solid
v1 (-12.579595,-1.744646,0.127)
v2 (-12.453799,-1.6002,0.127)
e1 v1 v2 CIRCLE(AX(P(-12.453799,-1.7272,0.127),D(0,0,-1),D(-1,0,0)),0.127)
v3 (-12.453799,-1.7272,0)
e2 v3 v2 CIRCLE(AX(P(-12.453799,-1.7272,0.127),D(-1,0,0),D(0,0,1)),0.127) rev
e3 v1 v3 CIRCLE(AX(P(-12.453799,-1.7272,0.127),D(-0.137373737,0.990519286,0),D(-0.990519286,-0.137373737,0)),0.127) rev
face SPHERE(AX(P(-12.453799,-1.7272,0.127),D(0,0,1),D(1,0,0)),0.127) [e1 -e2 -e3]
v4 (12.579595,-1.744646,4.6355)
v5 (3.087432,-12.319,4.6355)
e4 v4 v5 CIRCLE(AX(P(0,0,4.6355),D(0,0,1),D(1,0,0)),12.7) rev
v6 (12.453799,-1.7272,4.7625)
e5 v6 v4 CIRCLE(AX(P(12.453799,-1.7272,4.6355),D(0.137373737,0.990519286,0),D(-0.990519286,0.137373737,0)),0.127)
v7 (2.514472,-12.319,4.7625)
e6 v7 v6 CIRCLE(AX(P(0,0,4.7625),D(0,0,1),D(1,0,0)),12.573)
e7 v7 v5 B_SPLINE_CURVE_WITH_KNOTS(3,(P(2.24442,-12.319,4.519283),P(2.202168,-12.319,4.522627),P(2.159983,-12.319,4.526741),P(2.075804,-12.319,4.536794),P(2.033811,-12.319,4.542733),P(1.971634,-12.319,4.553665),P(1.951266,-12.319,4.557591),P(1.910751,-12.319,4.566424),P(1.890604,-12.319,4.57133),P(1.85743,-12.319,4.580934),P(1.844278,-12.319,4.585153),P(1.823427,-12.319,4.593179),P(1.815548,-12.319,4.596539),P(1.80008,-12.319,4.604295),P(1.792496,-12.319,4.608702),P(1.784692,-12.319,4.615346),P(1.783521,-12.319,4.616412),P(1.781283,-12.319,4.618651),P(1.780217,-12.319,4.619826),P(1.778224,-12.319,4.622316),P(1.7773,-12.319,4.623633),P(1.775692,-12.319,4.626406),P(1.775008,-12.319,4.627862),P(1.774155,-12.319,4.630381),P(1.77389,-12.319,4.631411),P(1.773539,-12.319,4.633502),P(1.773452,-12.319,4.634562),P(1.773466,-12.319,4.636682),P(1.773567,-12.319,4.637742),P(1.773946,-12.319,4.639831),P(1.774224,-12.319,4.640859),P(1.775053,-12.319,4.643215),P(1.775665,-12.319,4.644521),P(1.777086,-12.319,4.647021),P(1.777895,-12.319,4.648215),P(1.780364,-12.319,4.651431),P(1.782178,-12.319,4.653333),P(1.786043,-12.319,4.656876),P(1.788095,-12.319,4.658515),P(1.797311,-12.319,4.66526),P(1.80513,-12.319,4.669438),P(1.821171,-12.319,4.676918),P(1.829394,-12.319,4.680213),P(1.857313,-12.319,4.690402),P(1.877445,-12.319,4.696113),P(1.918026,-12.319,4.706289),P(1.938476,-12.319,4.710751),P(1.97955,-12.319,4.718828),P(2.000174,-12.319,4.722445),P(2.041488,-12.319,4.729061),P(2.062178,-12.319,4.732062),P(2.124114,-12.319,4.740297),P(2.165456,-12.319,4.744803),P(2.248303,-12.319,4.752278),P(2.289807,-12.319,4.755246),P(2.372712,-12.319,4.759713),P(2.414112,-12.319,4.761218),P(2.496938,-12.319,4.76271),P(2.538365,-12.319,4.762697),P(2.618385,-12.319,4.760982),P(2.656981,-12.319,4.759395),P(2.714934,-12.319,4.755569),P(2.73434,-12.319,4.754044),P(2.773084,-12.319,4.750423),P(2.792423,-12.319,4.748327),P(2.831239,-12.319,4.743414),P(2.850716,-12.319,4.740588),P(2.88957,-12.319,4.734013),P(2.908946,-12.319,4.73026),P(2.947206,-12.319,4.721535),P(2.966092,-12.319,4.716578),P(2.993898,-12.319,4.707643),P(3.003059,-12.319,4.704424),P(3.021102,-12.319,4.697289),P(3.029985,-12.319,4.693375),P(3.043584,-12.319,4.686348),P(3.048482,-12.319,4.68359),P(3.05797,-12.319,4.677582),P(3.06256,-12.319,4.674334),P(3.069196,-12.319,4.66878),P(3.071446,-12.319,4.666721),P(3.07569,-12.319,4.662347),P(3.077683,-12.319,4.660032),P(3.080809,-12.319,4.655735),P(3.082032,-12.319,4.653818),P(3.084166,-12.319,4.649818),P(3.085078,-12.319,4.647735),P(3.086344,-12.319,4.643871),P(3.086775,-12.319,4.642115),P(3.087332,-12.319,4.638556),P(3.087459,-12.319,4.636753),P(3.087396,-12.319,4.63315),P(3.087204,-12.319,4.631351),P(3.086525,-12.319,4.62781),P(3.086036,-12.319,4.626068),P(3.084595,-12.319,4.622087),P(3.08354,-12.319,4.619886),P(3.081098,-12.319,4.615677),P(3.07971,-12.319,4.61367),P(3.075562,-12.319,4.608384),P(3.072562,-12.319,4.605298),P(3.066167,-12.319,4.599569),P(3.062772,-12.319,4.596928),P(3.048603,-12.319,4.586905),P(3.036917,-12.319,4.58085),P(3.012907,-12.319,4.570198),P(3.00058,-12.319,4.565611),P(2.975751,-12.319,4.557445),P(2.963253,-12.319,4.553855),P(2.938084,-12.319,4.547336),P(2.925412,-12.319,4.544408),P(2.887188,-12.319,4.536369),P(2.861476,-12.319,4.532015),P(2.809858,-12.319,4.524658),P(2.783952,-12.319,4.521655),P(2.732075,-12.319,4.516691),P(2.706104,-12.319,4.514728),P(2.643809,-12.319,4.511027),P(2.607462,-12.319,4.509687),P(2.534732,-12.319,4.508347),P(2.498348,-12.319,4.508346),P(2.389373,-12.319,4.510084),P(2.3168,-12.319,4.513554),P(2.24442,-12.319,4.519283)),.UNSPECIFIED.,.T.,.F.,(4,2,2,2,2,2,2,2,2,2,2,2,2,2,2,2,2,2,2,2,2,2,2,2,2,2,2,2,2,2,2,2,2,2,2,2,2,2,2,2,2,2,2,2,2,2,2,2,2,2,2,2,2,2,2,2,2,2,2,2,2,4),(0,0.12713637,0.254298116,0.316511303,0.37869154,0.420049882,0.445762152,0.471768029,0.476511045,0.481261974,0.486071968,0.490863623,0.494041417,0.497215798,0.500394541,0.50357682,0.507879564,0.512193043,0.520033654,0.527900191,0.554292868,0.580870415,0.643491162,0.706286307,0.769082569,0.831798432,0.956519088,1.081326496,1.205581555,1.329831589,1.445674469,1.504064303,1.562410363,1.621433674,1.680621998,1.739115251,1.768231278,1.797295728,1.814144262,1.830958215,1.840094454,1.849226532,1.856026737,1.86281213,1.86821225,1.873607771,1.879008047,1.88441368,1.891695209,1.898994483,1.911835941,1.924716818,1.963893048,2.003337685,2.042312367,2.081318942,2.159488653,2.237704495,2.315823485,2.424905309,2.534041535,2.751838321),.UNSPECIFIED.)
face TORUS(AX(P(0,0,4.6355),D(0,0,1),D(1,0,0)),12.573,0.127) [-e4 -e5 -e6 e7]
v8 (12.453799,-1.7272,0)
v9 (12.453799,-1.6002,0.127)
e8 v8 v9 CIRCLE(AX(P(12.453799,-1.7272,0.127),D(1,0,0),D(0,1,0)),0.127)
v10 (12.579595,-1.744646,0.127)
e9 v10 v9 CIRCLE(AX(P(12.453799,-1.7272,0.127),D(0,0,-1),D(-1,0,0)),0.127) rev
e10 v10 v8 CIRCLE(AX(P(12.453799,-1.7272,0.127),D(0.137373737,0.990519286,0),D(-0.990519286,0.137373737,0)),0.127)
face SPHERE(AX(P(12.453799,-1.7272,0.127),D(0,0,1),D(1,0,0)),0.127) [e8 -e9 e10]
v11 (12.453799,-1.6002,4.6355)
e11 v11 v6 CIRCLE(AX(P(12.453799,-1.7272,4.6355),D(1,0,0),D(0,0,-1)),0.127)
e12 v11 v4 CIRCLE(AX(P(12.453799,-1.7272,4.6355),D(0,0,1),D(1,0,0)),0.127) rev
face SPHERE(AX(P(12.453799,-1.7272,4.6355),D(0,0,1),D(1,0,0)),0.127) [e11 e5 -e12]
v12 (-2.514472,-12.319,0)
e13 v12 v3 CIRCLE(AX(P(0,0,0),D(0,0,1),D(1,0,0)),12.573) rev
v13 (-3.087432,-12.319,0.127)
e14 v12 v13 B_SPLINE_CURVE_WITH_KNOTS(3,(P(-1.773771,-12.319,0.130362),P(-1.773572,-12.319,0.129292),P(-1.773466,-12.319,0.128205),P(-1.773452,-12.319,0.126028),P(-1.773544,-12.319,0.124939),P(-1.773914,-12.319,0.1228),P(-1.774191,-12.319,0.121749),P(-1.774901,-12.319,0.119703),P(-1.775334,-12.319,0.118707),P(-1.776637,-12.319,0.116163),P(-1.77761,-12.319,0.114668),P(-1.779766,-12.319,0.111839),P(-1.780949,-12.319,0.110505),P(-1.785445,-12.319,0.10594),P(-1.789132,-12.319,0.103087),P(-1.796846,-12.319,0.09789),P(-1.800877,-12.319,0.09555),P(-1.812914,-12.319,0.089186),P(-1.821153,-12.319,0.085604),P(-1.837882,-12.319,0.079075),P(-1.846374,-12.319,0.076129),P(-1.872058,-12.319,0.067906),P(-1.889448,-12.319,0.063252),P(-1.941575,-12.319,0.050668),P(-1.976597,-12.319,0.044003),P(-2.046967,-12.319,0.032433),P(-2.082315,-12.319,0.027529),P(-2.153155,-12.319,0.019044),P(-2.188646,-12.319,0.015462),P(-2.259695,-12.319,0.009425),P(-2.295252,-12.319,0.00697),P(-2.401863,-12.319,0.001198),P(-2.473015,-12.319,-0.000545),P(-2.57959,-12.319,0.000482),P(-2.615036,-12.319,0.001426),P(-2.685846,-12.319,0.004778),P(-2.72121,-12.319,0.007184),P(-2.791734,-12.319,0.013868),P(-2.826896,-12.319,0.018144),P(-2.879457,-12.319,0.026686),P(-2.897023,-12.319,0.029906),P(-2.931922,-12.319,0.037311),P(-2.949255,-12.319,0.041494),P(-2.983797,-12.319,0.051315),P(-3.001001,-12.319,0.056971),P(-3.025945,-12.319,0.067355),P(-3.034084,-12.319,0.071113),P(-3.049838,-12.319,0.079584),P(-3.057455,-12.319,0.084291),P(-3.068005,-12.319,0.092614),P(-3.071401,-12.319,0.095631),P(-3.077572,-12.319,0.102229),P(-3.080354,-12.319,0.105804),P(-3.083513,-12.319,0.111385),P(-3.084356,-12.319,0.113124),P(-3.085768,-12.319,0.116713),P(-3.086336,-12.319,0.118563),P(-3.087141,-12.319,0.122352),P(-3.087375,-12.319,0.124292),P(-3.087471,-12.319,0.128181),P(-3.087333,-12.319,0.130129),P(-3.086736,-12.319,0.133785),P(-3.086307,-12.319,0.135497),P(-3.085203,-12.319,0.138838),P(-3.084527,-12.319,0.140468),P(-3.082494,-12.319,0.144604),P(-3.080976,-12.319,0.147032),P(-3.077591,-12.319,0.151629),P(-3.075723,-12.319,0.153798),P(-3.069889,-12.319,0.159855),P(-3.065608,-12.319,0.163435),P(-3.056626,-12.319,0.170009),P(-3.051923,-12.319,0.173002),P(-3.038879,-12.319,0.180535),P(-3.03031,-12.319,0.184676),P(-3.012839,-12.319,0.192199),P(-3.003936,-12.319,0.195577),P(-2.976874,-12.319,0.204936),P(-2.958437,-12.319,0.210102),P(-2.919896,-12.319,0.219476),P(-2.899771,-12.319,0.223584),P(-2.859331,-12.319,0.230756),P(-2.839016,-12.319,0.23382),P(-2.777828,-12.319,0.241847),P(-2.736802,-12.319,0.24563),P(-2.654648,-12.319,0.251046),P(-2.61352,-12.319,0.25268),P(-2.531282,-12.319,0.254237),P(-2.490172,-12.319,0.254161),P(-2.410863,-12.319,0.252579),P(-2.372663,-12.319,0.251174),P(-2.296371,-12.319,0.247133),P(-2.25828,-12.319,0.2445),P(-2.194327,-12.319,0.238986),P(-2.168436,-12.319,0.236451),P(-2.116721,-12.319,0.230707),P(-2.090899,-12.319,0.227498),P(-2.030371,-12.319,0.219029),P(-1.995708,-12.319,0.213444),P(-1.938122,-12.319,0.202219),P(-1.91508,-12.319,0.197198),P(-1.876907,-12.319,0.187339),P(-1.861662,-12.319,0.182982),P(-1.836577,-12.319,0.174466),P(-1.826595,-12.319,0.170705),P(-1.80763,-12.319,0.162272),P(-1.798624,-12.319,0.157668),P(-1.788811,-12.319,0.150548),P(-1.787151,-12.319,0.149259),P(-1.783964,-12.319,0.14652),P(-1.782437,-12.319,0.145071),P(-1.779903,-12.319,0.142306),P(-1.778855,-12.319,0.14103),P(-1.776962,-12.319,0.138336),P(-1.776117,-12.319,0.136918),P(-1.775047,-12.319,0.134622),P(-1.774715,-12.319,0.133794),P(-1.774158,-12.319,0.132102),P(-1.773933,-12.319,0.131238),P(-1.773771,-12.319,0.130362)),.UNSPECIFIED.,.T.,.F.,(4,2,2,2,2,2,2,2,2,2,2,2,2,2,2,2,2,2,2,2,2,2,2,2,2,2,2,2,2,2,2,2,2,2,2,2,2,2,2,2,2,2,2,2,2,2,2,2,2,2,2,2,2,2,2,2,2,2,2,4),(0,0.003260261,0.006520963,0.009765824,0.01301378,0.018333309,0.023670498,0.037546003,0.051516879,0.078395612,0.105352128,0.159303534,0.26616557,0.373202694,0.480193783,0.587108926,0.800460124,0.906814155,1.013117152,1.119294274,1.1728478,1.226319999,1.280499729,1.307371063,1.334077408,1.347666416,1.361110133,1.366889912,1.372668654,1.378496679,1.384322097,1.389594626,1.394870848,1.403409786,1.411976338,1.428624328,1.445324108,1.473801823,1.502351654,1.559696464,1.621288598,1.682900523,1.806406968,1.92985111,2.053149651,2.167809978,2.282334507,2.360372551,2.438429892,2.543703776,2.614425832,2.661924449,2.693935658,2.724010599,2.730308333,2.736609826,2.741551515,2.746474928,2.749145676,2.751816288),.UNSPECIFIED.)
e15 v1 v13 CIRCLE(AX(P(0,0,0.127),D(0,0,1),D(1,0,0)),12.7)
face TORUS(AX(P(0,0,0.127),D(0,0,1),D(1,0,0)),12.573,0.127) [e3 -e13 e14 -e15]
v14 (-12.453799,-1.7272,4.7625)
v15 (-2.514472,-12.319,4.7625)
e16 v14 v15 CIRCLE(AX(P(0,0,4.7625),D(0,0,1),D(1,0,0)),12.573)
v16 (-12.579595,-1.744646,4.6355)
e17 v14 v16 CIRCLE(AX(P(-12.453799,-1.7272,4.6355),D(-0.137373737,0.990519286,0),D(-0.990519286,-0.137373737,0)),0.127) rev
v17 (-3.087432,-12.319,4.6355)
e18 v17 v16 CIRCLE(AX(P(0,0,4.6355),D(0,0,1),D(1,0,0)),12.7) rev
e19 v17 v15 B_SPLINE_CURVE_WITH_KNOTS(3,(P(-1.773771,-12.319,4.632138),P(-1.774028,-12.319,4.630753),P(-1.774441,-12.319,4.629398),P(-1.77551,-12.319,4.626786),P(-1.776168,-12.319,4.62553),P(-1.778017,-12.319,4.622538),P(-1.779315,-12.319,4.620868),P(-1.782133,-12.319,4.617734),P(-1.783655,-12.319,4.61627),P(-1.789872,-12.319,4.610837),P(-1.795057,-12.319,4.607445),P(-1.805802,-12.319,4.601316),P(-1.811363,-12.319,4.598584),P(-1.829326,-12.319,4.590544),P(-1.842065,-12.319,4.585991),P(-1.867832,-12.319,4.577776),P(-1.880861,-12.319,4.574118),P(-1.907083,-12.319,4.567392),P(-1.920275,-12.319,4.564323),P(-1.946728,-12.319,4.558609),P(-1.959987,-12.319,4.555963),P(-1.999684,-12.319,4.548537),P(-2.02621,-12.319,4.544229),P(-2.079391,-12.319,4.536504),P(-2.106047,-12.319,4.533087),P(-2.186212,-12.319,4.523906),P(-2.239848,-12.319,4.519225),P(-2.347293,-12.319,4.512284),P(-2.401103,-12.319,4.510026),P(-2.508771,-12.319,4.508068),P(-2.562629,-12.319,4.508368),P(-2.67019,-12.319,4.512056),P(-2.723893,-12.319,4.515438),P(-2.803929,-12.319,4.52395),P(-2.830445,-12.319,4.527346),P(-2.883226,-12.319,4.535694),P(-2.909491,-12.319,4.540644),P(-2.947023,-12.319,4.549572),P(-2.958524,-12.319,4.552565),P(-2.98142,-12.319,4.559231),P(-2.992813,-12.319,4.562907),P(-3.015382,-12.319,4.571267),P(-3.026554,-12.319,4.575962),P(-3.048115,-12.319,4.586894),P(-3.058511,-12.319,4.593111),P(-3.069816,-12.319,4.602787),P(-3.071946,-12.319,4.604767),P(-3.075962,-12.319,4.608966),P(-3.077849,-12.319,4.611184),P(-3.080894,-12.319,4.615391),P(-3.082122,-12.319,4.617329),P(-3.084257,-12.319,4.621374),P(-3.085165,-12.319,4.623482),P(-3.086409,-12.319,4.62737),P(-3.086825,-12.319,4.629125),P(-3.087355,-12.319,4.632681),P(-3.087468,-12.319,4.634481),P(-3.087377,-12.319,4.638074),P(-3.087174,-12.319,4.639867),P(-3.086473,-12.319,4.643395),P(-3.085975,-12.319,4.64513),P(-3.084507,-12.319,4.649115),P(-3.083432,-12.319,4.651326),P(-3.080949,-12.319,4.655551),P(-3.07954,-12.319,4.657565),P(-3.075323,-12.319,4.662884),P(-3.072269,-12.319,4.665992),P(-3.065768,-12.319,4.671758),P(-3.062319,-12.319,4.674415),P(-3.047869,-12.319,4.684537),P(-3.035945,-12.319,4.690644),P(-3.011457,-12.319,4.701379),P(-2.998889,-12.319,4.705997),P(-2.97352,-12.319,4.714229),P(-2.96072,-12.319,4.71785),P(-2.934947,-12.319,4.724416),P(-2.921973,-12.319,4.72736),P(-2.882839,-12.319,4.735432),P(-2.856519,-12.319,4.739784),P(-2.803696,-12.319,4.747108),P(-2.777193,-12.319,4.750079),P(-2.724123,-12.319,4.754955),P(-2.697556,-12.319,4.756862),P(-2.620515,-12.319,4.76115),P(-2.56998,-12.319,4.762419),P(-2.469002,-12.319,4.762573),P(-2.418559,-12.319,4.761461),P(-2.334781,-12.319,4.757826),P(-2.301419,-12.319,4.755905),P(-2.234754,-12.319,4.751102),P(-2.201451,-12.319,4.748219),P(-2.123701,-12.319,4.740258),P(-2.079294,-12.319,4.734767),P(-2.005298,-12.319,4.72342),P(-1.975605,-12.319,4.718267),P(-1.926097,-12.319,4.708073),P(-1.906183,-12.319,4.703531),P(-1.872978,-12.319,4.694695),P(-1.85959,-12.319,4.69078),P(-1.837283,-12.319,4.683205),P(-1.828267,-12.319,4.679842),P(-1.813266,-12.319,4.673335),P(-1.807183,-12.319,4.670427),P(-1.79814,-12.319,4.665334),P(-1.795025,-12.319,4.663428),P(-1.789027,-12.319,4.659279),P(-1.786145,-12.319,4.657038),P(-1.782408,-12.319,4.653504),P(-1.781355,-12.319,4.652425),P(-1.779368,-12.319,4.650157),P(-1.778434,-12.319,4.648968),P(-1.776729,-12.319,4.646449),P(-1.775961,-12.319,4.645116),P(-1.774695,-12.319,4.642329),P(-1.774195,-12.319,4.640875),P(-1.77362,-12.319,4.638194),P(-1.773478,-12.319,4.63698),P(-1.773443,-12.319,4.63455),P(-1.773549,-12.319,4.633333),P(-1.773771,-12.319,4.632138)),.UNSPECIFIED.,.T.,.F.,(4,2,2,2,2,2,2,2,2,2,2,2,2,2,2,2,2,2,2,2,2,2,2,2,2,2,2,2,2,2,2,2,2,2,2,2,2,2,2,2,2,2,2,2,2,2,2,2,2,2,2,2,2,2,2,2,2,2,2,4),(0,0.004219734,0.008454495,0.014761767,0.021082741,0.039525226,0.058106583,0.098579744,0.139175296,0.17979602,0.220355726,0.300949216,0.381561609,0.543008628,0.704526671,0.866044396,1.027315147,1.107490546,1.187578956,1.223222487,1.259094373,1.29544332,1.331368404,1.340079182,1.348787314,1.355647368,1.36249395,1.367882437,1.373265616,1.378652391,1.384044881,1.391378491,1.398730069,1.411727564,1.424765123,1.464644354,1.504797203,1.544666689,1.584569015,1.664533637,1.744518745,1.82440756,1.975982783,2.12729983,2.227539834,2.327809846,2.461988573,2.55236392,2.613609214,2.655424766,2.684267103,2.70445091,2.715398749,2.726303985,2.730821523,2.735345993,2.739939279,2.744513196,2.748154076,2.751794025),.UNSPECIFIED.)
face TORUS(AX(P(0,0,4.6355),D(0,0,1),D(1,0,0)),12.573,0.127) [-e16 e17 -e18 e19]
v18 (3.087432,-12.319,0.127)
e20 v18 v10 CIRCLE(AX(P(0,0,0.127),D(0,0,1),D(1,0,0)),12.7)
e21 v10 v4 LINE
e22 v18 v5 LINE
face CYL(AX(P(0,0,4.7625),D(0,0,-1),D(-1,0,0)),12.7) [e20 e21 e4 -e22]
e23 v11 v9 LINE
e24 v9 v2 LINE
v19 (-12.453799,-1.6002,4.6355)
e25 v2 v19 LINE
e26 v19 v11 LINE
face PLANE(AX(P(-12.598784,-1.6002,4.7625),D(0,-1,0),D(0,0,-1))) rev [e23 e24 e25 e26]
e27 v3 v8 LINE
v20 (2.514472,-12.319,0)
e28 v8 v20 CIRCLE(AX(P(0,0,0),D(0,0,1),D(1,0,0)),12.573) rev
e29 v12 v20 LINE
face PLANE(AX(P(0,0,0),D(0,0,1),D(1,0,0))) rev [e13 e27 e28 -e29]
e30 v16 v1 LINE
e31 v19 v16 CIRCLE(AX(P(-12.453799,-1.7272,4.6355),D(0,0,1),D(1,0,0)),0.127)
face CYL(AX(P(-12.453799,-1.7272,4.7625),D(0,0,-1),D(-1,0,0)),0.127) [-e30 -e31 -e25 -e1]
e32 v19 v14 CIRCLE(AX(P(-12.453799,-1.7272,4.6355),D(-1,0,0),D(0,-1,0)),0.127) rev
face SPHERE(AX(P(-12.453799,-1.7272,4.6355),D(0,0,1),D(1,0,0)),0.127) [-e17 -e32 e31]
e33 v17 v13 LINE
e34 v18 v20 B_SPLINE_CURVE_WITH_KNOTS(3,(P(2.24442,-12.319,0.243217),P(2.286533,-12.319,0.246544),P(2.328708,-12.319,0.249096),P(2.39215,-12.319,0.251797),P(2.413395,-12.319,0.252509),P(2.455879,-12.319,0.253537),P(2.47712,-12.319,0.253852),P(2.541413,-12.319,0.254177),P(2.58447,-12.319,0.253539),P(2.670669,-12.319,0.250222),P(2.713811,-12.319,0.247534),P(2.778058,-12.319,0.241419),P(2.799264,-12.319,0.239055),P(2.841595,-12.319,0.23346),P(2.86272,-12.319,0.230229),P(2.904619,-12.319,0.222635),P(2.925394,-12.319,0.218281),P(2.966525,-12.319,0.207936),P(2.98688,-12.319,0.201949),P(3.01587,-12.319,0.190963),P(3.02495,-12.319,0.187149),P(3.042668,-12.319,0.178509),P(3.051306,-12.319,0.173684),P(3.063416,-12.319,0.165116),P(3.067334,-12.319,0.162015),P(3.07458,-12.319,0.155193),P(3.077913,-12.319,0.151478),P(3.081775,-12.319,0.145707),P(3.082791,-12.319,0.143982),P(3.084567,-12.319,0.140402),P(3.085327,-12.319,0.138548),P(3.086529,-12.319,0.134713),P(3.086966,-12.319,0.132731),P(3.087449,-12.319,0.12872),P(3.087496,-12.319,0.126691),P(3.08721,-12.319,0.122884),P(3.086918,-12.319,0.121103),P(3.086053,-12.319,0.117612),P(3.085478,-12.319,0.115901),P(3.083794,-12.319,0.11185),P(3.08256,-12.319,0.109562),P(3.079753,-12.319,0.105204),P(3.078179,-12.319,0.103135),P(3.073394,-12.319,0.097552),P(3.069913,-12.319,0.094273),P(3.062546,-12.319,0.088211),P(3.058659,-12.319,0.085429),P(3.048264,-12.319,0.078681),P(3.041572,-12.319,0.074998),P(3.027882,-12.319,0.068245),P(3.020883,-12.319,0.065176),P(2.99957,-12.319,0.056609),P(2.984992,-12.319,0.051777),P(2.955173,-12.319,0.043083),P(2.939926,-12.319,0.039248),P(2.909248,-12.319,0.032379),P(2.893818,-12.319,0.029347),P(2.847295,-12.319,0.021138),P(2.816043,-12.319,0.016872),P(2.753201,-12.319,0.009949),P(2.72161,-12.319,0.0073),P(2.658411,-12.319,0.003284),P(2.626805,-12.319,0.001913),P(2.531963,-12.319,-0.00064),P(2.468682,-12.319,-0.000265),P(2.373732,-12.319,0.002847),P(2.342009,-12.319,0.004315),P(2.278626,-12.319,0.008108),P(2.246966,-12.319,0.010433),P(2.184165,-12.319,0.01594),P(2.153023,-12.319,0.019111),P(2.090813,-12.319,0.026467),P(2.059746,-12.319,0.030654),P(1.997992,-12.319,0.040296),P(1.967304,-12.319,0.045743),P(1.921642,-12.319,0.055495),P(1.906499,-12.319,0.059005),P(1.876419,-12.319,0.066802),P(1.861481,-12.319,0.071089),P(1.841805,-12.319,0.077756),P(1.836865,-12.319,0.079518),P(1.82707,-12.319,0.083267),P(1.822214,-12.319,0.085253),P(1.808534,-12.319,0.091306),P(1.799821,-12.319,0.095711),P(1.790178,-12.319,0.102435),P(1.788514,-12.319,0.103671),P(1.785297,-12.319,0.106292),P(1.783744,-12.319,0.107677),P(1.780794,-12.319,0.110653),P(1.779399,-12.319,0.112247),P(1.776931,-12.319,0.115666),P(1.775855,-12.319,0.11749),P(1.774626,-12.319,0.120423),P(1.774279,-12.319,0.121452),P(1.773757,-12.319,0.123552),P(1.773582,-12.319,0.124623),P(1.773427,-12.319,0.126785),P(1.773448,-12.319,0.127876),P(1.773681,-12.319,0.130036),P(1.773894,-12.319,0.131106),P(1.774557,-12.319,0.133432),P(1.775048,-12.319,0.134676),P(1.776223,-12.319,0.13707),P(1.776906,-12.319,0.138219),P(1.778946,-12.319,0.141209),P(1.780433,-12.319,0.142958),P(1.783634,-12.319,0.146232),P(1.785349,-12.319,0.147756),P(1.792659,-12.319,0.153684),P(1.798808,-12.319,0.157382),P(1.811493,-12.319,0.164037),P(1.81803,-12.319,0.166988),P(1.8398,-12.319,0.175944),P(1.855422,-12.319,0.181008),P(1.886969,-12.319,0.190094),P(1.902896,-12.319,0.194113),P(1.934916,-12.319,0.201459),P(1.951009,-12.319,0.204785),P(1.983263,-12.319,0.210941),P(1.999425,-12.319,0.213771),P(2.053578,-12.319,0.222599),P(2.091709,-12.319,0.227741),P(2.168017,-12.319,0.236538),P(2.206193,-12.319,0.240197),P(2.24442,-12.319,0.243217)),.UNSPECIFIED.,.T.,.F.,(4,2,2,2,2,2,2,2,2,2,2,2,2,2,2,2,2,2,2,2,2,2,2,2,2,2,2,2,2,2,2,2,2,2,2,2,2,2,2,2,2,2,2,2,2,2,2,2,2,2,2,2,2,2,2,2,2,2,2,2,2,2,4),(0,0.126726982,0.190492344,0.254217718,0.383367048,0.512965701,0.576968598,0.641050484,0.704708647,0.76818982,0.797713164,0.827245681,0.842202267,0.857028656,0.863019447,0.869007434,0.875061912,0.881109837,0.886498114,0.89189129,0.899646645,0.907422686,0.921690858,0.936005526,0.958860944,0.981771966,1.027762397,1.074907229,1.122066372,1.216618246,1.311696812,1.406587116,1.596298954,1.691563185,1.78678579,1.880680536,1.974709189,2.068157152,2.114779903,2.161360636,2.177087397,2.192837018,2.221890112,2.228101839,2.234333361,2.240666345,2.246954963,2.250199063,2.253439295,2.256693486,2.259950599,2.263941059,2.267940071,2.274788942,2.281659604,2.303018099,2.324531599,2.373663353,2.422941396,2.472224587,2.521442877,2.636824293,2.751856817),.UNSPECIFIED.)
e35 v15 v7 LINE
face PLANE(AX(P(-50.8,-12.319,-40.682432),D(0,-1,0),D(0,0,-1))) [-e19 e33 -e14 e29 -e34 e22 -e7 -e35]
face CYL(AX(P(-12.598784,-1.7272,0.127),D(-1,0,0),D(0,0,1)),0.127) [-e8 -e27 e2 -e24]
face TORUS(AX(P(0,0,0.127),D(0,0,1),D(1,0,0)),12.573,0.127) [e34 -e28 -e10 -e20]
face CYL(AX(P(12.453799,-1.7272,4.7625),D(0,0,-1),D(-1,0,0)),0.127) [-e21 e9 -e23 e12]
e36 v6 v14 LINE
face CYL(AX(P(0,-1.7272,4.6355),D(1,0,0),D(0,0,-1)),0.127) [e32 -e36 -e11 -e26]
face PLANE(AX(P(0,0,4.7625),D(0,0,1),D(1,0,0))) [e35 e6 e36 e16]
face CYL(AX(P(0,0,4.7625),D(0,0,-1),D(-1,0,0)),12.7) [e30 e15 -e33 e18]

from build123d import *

# Parameters (mm, degrees)
EXTRUDE1_DEPTH          = 4.7625
FILLET3_R               = 0.127
CUT_EXTRUDE2_DEPTH      = 19.499943496
CUT_EXTRUDE2_DEPTH_BACK = 19.499943496


with BuildPart() as part:
    # Sketch1 → Extrude1 (new body)
    with BuildSketch(Plane.XY):
        with BuildLine():
            Line((-12.598784067, -1.6002), (12.598784067, -1.6002))
            ThreePointArc((12.598784067, -1.6002), (0, -12.7), (-12.598784067, -1.6002))
        make_face()
    extrude(amount=EXTRUDE1_DEPTH)

    # Fillet3
    fillet3_edges = [part.edges().sort_by_distance(p)[0] for p in [
        (12.598784067, -1.6002, 2.38125),
        (-12.598784067, -1.6002, 2.38125),
        (0, -1.6002, 4.7625),
        (0, -12.7, 4.7625),
        (0, -1.6002, 0),
        (0, -12.7, 0),
    ]]
    fillet(fillet3_edges, radius=FILLET3_R)

    # Sketch3 → Cut-Extrude2 (cut, two sides: drawn at the far end of the back side and taken through both)
    with BuildSketch(Plane.XY.offset(-CUT_EXTRUDE2_DEPTH_BACK)):
        Polygon((-189.36155496, -12.319), (-50.8, -12.319), (50.8, -12.319), (189.36155496, -12.319), (189.36155496, -289.44210992), (-189.36155496, -289.44210992), align=None)
    extrude(amount=CUT_EXTRUDE2_DEPTH + CUT_EXTRUDE2_DEPTH_BACK, mode=Mode.SUBTRACT)


solid = part.part
